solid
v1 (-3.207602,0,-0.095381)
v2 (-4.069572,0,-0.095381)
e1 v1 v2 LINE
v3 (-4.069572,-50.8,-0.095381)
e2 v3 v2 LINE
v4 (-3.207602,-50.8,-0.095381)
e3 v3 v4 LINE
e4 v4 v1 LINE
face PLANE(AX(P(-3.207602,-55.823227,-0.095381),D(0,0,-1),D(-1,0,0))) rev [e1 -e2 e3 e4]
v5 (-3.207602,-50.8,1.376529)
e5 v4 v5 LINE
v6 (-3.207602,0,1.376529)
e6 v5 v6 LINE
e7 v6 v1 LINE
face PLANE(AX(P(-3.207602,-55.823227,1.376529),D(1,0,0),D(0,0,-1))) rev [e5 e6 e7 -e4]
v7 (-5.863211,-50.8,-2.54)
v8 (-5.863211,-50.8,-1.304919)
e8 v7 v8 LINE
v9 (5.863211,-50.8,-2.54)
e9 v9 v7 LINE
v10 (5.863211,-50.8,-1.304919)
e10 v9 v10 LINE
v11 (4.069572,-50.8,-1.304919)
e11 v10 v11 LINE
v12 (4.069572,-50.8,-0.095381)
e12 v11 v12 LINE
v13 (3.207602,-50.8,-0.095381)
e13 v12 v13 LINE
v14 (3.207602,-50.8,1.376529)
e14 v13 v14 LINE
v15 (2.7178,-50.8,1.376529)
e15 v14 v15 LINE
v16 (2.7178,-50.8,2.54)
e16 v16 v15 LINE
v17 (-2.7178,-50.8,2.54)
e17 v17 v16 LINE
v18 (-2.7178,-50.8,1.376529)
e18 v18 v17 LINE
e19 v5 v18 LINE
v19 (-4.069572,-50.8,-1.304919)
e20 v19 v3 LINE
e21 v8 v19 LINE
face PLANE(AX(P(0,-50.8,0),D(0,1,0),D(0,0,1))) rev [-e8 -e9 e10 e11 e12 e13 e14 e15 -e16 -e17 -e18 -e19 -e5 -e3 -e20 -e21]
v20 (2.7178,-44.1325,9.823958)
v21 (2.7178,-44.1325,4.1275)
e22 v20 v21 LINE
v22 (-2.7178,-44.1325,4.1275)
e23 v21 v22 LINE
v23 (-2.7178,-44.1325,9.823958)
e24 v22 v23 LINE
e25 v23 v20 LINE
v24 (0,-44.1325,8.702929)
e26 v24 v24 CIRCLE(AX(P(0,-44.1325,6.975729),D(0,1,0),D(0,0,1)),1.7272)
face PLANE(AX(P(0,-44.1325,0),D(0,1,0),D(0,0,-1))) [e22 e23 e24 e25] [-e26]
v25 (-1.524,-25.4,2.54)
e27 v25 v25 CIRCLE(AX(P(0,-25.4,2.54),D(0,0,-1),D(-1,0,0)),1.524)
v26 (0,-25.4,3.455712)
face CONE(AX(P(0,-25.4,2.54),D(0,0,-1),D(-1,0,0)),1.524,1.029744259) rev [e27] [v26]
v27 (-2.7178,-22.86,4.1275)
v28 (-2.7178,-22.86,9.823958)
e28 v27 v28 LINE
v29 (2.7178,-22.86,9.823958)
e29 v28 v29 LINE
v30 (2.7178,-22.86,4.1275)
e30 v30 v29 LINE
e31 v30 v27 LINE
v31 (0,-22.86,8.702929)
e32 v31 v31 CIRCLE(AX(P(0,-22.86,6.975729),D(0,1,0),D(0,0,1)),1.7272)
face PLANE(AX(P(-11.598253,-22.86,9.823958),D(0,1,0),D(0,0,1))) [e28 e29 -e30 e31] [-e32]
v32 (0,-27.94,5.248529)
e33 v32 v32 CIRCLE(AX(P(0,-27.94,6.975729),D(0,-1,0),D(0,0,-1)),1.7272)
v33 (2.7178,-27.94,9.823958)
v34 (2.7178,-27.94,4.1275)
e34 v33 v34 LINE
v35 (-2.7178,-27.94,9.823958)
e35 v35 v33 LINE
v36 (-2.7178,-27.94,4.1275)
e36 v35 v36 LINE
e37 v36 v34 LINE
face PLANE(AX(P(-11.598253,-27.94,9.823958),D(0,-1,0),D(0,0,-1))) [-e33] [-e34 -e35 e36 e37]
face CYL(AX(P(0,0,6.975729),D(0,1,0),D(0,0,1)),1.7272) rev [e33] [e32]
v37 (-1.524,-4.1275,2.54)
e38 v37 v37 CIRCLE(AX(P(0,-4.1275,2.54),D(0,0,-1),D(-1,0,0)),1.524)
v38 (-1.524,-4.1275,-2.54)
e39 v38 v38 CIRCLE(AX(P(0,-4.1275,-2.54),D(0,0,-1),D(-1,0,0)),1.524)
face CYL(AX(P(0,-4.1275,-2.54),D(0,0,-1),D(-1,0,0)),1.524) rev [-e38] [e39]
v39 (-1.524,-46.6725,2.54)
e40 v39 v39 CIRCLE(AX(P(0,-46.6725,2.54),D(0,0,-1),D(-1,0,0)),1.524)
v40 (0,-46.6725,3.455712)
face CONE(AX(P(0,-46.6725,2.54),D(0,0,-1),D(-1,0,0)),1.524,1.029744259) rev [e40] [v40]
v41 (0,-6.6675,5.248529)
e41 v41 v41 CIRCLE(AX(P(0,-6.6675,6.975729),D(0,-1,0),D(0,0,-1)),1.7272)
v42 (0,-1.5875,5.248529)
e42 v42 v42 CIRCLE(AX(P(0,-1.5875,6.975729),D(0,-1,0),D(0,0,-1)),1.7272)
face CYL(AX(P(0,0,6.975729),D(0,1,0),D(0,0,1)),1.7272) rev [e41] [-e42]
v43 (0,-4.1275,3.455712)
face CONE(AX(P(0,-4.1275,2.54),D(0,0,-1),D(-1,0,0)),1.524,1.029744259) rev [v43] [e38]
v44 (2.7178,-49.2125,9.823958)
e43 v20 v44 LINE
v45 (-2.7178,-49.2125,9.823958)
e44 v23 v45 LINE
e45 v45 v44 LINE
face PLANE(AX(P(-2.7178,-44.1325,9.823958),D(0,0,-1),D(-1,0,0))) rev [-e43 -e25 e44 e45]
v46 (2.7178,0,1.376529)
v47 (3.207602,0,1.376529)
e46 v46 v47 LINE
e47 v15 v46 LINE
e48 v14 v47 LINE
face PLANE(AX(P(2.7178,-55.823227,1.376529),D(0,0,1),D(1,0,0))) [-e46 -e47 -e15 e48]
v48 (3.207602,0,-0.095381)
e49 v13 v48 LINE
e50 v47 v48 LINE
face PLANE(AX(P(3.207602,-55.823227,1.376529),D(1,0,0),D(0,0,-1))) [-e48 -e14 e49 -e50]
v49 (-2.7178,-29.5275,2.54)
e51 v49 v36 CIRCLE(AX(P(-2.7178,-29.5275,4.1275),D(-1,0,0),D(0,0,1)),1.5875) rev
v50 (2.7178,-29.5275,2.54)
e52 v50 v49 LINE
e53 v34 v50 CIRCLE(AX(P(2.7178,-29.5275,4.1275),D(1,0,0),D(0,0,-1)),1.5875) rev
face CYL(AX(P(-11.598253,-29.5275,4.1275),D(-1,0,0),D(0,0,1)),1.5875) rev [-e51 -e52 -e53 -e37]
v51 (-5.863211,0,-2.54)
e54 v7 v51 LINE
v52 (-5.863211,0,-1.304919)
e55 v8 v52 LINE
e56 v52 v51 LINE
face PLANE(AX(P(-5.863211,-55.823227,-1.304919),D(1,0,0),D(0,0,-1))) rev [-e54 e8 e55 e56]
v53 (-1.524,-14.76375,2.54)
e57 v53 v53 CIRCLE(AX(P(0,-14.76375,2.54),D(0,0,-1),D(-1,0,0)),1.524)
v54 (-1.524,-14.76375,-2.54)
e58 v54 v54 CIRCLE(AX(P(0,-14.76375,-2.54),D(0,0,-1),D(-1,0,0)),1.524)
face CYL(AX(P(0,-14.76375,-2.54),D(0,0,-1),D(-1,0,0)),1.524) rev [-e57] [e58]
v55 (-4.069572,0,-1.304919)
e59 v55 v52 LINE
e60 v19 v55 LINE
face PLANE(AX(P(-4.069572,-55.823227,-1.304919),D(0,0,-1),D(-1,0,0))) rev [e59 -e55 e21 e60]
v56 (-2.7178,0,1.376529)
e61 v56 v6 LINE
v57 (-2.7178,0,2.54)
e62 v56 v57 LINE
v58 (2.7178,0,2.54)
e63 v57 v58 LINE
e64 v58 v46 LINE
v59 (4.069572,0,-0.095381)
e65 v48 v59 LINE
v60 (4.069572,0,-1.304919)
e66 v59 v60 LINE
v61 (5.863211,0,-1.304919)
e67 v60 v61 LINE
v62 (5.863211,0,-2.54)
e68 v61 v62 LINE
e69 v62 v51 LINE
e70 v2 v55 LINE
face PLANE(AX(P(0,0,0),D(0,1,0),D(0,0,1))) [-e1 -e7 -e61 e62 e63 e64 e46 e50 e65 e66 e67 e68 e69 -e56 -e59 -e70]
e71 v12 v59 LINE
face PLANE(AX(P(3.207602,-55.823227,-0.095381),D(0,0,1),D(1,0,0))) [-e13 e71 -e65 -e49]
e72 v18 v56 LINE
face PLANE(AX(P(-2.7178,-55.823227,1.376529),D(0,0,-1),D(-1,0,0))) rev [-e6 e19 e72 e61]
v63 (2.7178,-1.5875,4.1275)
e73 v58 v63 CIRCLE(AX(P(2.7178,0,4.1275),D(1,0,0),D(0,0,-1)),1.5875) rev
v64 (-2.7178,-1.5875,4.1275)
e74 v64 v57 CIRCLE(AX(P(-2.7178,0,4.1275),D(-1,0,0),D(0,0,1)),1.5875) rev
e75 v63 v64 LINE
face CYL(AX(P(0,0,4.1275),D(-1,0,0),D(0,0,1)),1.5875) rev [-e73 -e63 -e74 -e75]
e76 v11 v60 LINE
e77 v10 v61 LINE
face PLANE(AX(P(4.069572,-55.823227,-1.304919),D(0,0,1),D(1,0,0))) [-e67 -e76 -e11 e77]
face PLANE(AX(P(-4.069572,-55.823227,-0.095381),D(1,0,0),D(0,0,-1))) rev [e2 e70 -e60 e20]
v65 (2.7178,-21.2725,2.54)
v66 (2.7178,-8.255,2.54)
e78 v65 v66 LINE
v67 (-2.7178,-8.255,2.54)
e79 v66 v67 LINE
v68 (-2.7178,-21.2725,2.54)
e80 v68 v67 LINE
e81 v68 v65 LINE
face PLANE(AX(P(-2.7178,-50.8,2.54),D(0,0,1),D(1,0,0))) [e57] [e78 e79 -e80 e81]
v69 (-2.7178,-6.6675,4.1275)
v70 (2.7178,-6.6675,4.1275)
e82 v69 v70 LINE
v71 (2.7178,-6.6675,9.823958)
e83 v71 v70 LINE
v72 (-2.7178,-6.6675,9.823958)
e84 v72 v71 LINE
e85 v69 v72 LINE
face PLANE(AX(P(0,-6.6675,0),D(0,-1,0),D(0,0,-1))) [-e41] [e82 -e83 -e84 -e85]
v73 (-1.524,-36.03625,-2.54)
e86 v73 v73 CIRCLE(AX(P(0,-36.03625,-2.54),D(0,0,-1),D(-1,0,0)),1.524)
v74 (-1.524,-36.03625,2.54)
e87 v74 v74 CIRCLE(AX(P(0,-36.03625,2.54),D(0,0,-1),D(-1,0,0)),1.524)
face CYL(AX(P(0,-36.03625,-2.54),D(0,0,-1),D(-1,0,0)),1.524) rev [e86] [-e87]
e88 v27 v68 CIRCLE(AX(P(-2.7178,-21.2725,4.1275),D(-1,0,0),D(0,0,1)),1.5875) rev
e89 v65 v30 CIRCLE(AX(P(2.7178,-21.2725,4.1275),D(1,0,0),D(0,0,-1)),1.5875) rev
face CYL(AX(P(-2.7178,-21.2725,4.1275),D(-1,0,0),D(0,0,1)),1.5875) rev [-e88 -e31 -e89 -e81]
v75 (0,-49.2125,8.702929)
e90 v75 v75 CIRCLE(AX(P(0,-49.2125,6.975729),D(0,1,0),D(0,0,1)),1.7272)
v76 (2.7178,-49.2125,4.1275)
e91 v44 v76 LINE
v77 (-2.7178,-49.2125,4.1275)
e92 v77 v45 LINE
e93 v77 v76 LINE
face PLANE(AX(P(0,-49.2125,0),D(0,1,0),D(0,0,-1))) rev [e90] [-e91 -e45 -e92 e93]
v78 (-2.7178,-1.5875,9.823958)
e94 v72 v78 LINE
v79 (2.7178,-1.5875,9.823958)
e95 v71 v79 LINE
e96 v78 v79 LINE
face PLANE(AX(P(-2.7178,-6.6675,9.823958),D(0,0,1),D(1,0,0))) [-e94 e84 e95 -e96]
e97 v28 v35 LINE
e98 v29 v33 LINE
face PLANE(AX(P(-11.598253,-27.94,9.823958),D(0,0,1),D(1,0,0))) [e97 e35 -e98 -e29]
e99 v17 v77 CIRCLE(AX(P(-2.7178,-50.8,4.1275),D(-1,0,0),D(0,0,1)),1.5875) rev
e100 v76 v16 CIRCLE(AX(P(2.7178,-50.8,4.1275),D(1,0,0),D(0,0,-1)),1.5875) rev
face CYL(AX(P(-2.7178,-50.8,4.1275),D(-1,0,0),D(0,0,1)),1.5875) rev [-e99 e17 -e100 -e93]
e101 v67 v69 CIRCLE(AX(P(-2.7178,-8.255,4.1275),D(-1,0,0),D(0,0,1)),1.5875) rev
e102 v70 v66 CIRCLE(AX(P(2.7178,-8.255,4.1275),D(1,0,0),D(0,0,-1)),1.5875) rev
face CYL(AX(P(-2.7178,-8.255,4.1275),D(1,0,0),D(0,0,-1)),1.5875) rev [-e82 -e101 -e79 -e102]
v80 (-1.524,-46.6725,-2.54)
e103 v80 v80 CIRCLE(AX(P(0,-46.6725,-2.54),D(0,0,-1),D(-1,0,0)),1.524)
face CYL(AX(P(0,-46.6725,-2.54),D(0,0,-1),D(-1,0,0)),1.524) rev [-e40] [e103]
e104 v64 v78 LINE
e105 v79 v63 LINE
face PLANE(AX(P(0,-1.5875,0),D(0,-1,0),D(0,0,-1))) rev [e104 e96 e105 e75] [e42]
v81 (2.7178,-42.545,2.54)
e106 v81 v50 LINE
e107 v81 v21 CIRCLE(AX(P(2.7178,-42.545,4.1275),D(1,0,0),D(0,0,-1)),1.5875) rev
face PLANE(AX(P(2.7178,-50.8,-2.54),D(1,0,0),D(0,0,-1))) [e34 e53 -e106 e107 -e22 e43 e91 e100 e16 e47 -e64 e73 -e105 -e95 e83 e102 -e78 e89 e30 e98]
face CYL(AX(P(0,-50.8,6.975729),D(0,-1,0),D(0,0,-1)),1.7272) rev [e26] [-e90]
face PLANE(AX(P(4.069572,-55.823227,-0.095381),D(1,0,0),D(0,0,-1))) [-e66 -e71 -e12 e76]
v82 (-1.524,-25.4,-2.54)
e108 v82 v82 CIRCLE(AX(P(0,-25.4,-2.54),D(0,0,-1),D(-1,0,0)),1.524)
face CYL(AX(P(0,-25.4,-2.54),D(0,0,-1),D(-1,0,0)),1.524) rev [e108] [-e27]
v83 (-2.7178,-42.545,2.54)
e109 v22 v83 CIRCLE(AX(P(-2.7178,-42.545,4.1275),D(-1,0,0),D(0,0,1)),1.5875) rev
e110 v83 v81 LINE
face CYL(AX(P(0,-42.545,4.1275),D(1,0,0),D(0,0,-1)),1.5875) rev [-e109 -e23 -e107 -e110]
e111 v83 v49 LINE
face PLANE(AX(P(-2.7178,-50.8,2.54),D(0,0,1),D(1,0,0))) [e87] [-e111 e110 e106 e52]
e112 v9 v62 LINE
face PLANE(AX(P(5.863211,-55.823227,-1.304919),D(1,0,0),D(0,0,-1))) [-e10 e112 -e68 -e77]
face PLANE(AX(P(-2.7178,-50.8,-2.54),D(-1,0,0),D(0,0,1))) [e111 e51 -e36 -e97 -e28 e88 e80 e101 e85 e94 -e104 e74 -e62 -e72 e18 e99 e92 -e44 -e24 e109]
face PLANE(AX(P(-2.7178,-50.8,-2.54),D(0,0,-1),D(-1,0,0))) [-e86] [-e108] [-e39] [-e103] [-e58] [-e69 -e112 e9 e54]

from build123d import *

# Parameters (mm, degrees)
SKETCH1_W                            = 5.4356
SKETCH1_H                            = 5.08
BOSS_EXTRUDE1_DEPTH                  = 50.8
SKETCH4_W                            = 5.4356
SKETCH4_H                            = 7.283958
BOSS_EXTRUDE3_DEPTH                  = 5.08
SKETCH13_W                           = 7.283958
SKETCH13_H                           = 5.08
BOSS_EXTRUDE6_DEPTH                  = 5.4356
FILLET1_R                            = 1.5875
F_4_CLEARANCE_HOLE1_D                = 3.4544
FILLET1_OF_MIRROR5_R                 = 1.5875
BOSS_EXTRUDE4_DEPTH                  = 50.8
TAPPED_HOLE_FOR_4_40_HELICOIL1_D     = 3.048
TAPPED_HOLE_FOR_4_40_HELICOIL1_DEPTH = 5.08
TAPPED_HOLE_FOR_4_40_HELICOIL1_TIP   = 0.915711583


with BuildPart() as part:
    # Sketch1 → Boss-Extrude1 (new body)
    with BuildSketch(Plane(origin=(0, 0, 0), x_dir=(1, 0, 0), z_dir=(0, 1, 0))):
        Rectangle(SKETCH1_W, SKETCH1_H)
    extrude(amount=-BOSS_EXTRUDE1_DEPTH)

    # Sketch4 → Boss-Extrude3 (add)
    with BuildSketch(Plane(origin=(0, -1.5875, 0), x_dir=(1, 0, 0), z_dir=(0, 1, 0))):
        with Locations((0, -6.181979)):
            Rectangle(SKETCH4_W, SKETCH4_H)
    boss_extrude3 = extrude(amount=-BOSS_EXTRUDE3_DEPTH)

    # Sketch13 → Boss-Extrude6 (add)
    with BuildSketch(Plane(origin=(2.7178, 0, 0), x_dir=(0, 0, -1), z_dir=(1, 0, 0))):
        with Locations((-6.181979, -25.4)):
            Rectangle(SKETCH13_W, SKETCH13_H)
    extrude(amount=-BOSS_EXTRUDE6_DEPTH)

    # Fillet1
    fillet1_edges = [part.edges().sort_by_distance(p)[0] for p in [
        (0, -6.6675, 2.54),
        (0, -1.5875, 2.54),
        (0, -27.94, 2.54),
        (0, -22.86, 2.54),
    ]]
    fillet(fillet1_edges, radius=FILLET1_R - 0.0001)  # a hair under: the kernel refuses the full size

    # #4 Clearance Hole1 (through all)
    with Locations(Plane(origin=(0, 0, 0), x_dir=(1, 0, 0), z_dir=(0, 1, 0))):
        with Locations((0, -6.975729)):
            f_4_clearance_hole1 = Hole(F_4_CLEARANCE_HOLE1_D / 2)

    # Mirror5: Boss-Extrude3, #4 Clearance Hole1 across plane
    add(boss_extrude3.mirror(Plane.ZX.offset(-25.4)))
    add(f_4_clearance_hole1.mirror(Plane.ZX.offset(-25.4)), mode=Mode.SUBTRACT)

    # Fillet1 of Mirror5
    fillet1_of_mirror5_edges = [part.edges().sort_by_distance(p)[0] for p in [
        (0, -44.1325, 2.54),
        (0, -49.2125, 2.54),
        (0, -21.2726, 2.54),
        (0, -27.94, 4.1274),
    ]]
    fillet(fillet1_of_mirror5_edges, radius=FILLET1_OF_MIRROR5_R - 0.0001)  # a hair under: the kernel refuses the full size

    # Sketch7 → Boss-Extrude4 (add)
    with BuildSketch(Plane(origin=(0, 0, 0), x_dir=(1, 0, 0), z_dir=(0, 1, 0))):
        Polygon((3.207601712, -1.376528509), (3.207601712, 0.095381072), (4.069572105, 0.095381072), (4.069572105, 1.304918523), (5.863211288, 1.304918523), (5.863211288, 2.54), (2.7178, 2.54), (2.7178, -1.376528509), align=None)
    boss_extrude4 = extrude(amount=-BOSS_EXTRUDE4_DEPTH)

    # Mirror6: Boss-Extrude4 across plane
    add(boss_extrude4.mirror(Plane(origin=(0, 0, 0), x_dir=(0, 0, 1), z_dir=(1, 0, 0))))

    # Tapped Hole for #4-40 Helicoil1
    with Locations(Plane(origin=(0, 0, -2.54), x_dir=(-1, 0, 0), z_dir=(0, 0, -1))):
        with Locations((0, -4.1275), (0, -46.6725), (0, -25.4), (0, -14.76375), (0, -36.03625)):
            Hole(TAPPED_HOLE_FOR_4_40_HELICOIL1_D / 2, depth=TAPPED_HOLE_FOR_4_40_HELICOIL1_DEPTH)
            with Locations((0, 0, -(TAPPED_HOLE_FOR_4_40_HELICOIL1_DEPTH + TAPPED_HOLE_FOR_4_40_HELICOIL1_TIP / 2))):  # 118° drill point
                Cone(0, TAPPED_HOLE_FOR_4_40_HELICOIL1_D / 2, TAPPED_HOLE_FOR_4_40_HELICOIL1_TIP, mode=Mode.SUBTRACT)


solid = part.part
